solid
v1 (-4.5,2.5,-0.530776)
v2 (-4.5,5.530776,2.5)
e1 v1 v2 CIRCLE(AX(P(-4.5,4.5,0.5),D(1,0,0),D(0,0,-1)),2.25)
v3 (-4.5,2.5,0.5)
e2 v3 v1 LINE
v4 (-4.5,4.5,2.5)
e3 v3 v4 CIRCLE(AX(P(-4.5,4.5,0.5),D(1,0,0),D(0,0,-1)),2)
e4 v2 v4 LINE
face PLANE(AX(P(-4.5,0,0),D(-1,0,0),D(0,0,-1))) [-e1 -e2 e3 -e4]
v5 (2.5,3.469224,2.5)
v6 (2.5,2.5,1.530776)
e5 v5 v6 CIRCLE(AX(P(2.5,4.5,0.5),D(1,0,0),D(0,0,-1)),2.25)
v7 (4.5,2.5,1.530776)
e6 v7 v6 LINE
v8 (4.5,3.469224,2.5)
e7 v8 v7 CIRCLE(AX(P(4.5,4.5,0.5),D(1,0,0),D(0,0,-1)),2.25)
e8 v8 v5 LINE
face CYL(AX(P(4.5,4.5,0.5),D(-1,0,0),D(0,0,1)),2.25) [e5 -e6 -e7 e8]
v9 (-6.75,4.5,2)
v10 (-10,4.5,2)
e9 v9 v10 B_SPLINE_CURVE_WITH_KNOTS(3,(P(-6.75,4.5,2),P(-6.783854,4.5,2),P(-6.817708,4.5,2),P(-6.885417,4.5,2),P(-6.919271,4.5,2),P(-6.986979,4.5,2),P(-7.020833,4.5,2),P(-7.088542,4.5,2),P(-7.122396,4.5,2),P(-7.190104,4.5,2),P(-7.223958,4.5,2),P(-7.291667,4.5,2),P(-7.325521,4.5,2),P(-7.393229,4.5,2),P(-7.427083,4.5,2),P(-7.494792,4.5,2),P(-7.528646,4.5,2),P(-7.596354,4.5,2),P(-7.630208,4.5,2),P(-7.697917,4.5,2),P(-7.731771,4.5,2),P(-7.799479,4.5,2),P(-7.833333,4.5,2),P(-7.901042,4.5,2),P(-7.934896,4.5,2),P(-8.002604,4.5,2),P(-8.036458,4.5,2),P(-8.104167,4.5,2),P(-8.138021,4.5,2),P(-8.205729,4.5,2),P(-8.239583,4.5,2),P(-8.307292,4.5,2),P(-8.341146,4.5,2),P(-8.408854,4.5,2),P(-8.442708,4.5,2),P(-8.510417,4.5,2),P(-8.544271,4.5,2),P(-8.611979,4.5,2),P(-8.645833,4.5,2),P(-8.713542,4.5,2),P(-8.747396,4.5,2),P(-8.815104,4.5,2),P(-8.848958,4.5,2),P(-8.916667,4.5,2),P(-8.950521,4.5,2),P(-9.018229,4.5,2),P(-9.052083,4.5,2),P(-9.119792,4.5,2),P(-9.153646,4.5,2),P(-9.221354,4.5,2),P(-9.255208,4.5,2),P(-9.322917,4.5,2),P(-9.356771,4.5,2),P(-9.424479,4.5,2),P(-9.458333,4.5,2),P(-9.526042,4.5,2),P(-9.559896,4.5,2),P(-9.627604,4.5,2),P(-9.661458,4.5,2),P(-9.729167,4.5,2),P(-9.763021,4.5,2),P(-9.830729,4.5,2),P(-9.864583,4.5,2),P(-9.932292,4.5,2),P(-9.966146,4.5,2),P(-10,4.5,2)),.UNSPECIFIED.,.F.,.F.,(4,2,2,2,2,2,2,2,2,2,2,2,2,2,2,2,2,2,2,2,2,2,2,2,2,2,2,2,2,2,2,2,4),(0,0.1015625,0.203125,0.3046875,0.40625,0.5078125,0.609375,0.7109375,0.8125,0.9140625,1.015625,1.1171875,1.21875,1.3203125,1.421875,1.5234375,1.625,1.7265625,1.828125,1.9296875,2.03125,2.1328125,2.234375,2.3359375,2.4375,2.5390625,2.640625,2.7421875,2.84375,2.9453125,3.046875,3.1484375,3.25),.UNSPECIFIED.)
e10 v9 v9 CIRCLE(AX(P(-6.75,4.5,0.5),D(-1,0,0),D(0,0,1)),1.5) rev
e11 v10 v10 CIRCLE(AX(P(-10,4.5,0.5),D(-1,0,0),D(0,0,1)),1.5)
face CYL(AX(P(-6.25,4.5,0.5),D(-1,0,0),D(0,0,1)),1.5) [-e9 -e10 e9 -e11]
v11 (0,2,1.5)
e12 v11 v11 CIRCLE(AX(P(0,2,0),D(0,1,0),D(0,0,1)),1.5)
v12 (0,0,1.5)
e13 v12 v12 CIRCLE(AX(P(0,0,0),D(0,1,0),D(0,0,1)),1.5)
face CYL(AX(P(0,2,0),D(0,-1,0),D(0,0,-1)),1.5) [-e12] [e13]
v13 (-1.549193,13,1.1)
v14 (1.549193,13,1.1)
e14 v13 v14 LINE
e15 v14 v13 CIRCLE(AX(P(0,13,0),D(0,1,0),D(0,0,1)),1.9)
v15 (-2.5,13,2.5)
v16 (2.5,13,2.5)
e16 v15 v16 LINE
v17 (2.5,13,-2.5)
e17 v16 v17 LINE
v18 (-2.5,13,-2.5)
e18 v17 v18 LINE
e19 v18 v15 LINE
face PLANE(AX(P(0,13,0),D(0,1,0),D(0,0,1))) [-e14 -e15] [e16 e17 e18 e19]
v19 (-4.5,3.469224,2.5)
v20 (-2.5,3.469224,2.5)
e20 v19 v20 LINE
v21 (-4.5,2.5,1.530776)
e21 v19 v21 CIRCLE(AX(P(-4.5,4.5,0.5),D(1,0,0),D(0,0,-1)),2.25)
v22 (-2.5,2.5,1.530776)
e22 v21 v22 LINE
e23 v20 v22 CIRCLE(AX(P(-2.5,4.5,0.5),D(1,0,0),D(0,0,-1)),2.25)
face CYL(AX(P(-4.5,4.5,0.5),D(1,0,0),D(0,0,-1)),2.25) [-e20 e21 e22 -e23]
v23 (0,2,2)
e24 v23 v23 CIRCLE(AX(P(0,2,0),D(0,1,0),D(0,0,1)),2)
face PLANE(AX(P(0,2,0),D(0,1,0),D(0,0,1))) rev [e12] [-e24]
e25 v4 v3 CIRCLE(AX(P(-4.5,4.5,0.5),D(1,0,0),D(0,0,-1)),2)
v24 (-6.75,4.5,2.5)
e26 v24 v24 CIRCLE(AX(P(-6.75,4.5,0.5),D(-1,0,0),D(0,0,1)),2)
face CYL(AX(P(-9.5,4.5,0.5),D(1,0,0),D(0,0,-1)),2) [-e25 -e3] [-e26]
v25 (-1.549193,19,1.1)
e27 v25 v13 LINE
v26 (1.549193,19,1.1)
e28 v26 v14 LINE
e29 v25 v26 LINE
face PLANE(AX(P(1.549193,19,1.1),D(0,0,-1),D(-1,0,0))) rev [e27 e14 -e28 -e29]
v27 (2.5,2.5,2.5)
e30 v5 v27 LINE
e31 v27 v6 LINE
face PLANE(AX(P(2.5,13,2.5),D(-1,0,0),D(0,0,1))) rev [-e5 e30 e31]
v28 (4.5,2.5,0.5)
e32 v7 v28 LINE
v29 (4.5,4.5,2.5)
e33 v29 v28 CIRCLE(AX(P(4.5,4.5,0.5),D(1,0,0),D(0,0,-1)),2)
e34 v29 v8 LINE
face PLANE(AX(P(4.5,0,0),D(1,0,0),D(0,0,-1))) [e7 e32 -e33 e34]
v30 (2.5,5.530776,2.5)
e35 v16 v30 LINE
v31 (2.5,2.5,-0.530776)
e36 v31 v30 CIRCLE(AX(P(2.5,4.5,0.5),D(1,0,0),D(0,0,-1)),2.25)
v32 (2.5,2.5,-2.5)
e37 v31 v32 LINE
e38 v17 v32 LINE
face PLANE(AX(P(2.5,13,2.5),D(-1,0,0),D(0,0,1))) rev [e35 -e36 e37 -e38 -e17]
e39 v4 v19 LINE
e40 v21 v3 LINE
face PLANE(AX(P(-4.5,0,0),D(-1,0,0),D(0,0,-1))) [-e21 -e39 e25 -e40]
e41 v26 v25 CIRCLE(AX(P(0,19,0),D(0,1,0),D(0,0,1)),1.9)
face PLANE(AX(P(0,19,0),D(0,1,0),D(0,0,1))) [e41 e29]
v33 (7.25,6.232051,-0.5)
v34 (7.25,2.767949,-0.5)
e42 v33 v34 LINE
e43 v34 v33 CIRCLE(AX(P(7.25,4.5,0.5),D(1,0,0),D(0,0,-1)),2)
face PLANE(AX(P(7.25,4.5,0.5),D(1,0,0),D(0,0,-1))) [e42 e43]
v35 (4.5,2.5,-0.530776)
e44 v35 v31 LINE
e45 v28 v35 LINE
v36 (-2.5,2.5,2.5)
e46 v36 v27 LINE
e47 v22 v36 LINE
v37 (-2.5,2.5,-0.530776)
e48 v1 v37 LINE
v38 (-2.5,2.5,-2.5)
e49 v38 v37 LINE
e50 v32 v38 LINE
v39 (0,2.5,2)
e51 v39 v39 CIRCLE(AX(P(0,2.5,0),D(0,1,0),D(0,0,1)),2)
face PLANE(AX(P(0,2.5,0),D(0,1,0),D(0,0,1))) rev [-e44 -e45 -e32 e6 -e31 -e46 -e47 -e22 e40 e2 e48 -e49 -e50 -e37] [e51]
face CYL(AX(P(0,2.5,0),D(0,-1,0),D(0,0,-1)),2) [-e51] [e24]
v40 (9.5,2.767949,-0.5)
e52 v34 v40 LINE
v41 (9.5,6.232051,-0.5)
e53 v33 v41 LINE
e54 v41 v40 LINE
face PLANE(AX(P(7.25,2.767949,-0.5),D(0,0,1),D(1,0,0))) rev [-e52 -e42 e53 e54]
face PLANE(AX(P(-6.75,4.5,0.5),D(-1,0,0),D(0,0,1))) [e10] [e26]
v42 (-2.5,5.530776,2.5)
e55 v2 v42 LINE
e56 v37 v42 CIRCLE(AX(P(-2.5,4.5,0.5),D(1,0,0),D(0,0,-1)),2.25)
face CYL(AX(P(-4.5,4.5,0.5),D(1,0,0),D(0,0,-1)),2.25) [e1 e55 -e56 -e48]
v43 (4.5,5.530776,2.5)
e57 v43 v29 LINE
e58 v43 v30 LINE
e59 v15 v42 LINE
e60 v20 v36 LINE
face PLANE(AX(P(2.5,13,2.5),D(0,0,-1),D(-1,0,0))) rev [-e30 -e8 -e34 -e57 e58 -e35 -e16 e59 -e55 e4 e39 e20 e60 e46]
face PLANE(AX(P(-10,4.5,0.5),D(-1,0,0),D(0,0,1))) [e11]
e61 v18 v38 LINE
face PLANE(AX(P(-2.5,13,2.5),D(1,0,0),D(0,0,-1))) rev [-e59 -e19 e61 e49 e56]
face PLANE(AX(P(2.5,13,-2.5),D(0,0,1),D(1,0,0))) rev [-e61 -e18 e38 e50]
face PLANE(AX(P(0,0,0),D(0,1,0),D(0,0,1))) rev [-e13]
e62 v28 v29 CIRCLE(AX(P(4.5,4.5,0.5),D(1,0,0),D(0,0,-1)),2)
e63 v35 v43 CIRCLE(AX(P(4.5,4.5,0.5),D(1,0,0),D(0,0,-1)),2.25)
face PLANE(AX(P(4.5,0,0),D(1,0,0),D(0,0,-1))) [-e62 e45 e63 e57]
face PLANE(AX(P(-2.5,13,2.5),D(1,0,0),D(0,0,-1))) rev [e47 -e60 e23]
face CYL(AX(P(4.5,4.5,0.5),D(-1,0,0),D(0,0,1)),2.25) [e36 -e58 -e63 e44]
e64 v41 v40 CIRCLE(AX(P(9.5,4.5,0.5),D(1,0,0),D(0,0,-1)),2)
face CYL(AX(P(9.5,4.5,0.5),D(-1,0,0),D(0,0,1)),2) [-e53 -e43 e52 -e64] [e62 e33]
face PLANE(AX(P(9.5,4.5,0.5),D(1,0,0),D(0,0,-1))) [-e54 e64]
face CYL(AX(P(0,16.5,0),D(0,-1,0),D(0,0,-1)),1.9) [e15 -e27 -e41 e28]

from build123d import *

# Parameters (mm, degrees)
SKETCH1_R            = 1.5
BOSS_EXTRUDE1_DEPTH  = 2
SKETCH2_R            = 2
BOSS_EXTRUDE2_DEPTH  = 0.5
SKETCH3_W            = 5
SKETCH3_H            = 5
BOSS_EXTRUDE3_DEPTH  = 10.5
SKETCH4_R            = 1.9
BOSS_EXTRUDE4_DEPTH  = 3.5
BOSS_EXTRUDE5_DEPTH  = 2.5
BOSS_EXTRUDE9_DEPTH  = 2
SKETCH8_R            = 2
BOSS_EXTRUDE10_DEPTH = 5
BOSS_EXTRUDE12_START = -3.5
BOSS_EXTRUDE12_DEPTH = 3.5
CUT_EXTRUDE1_START   = -3.5
CUT_EXTRUDE1_DEPTH   = 3.5
CUT_EXTRUDE4_START   = -2.25
CUT_EXTRUDE4_DEPTH   = 2.25
SKETCH14_R           = 2
SKETCH14_R_2         = 1.5
CUT_EXTRUDE5_DEPTH   = 3.25
BOSS_EXTRUDE13_START = 0.5
SKETCH15_R           = 2
SKETCH15_R_2         = 1.5
BOSS_EXTRUDE13_DEPTH = 0.5
BOSS_EXTRUDE14_START = 0.5
SKETCH17_R           = 1.5
BOSS_EXTRUDE14_DEPTH = 0.5


# Read off the part's stored shape, not the designer's step: Cut-Extrude4
with BuildPart() as part:
    # Sketch1 → Boss-Extrude1 (new body)
    with BuildSketch(Plane(origin=(0, 0, 0), x_dir=(1, 0, 0), z_dir=(0, 1, 0))):
        with Locations(Location((0, 0, 0), (0, 0, 270))):
            Circle(SKETCH1_R)
    extrude(amount=BOSS_EXTRUDE1_DEPTH)

    # Sketch2 → Boss-Extrude2 (add)
    with BuildSketch(Plane(origin=(0, 2, 0), x_dir=(1, 0, 0), z_dir=(0, 1, 0))):
        with Locations(Location((0, 0, 0), (0, 0, 270))):
            Circle(SKETCH2_R)
    extrude(amount=BOSS_EXTRUDE2_DEPTH)

    # Sketch3 → Boss-Extrude3 (add)
    with BuildSketch(Plane(origin=(0, 2.5, 0), x_dir=(1, 0, 0), z_dir=(0, 1, 0))):
        Rectangle(SKETCH3_W, SKETCH3_H)
    extrude(amount=BOSS_EXTRUDE3_DEPTH)

    # Sketch4 → Boss-Extrude4 (add)
    with BuildSketch(Plane(origin=(0, 13, 0), x_dir=(1, 0, 0), z_dir=(0, 1, 0))):
        with Locations(Location((0, 0, 0), (0, 0, 270))):
            Circle(SKETCH4_R)
    extrude(amount=BOSS_EXTRUDE4_DEPTH)

    # Sketch5 → Boss-Extrude5 (add)
    with BuildSketch(Plane(origin=(0, 16.5, 0), x_dir=(1, 0, 0), z_dir=(0, 1, 0))):
        with BuildLine():
            Line((1.549193338, -1.1), (-1.549193338, -1.1))
            ThreePointArc((-1.549193338, -1.1), (0, 1.9), (1.549193338, -1.1))
        make_face()
    extrude(amount=BOSS_EXTRUDE5_DEPTH)

    # Sketch7 → Boss-Extrude9 (add)
    with BuildSketch(Plane(origin=(2.5, 0, 0), x_dir=(0, 0, -1), z_dir=(1, 0, 0))):
        with BuildLine():
            ThreePointArc((-2.5, 3.469223594), (-2.090990258, 2.909009742), (-1.530776406, 2.5))
            Line((-1.530776406, 2.5), (0.530776406, 2.5))
            ThreePointArc((0.530776406, 2.5), (1.090990258, 6.090990258), (-2.5, 5.530776406))
            Line((-2.5, 5.530776406), (-2.5, 3.469223594))
        make_face()
    boss_extrude9 = extrude(amount=BOSS_EXTRUDE9_DEPTH)

    # Sketch8 → Boss-Extrude10 (add)
    with BuildSketch(Plane(origin=(4.5, 0, 0), x_dir=(0, 0, -1), z_dir=(1, 0, 0))):
        with Locations(Location((-0.5, 4.5, 0), (0, 0, 180))):
            Circle(SKETCH8_R)
    boss_extrude10 = extrude(amount=BOSS_EXTRUDE10_DEPTH)

    # Mirror1: Boss-Extrude9, Boss-Extrude10 across plane
    add(boss_extrude9.mirror(Plane(origin=(0, 0, 0), x_dir=(0, 0, 1), z_dir=(1, 0, 0))))
    add(boss_extrude10.mirror(Plane(origin=(0, 0, 0), x_dir=(0, 0, 1), z_dir=(1, 0, 0))))

    # Sketch10 → Boss-Extrude12 (add)
    with BuildSketch(Plane(origin=(0, 16.5, 0), x_dir=(1, 0, 0), z_dir=(0, 1, 0)).offset(BOSS_EXTRUDE12_START)):
        with BuildLine():
            ThreePointArc((-1.549193338, -1.1), (0, -1.9), (1.549193338, -1.1))
            Line((1.549193338, -1.1), (-1.549193338, -1.1))
        make_face()
    extrude(amount=BOSS_EXTRUDE12_DEPTH)

    # Sketch11 → Cut-Extrude1 (cut)
    with BuildSketch(Plane(origin=(0, 16.5, 0), x_dir=(1, 0, 0), z_dir=(0, 1, 0)).offset(CUT_EXTRUDE1_START)):
        with BuildLine():
            Line((-1.549193338, -1.1), (1.549193338, -1.1))
            ThreePointArc((1.549193338, -1.1), (0, -1.9), (-1.549193338, -1.1))
        make_face()
    extrude(amount=CUT_EXTRUDE1_DEPTH, mode=Mode.SUBTRACT)

    # Cut-Extrude4 outline → Cut-Extrude4 (cut)
    with BuildSketch(Plane(origin=(9.5, 0, 0), x_dir=(0, 0, -1), z_dir=(1, 0, 0)).offset(CUT_EXTRUDE4_START)):
        with BuildLine():
            ThreePointArc((0.5, 2.767949192), (1.5, 4.5), (0.5, 6.232050808))
            Line((0.5, 6.232050808), (0.5, 2.767949192))
        make_face()
    extrude(amount=CUT_EXTRUDE4_DEPTH, mode=Mode.SUBTRACT)

    # Sketch14 → Cut-Extrude5 (cut)
    with BuildSketch(Plane.ZY.offset(9.5)):
        with Locations((0.5, 4.5)):
            Circle(SKETCH14_R)
        with Locations((0.5, 4.5)):
            Circle(SKETCH14_R_2, mode=Mode.SUBTRACT)
    extrude(amount=-CUT_EXTRUDE5_DEPTH, mode=Mode.SUBTRACT)

    # Sketch15 → Boss-Extrude13 (add)
    with BuildSketch(Plane.ZY.offset(6.25).offset(BOSS_EXTRUDE13_START)):
        with Locations((0.5, 4.5)):
            Circle(SKETCH15_R)
        with Locations((0.5, 4.5)):
            Circle(SKETCH15_R_2, mode=Mode.SUBTRACT)
    extrude(amount=-BOSS_EXTRUDE13_DEPTH)

    # Sketch17 → Boss-Extrude14 (add)
    with BuildSketch(Plane.ZY.offset(9.5).offset(BOSS_EXTRUDE14_START)):
        with Locations((0.5, 4.5)):
            Circle(SKETCH17_R)
    extrude(amount=-BOSS_EXTRUDE14_DEPTH)


solid = part.part
